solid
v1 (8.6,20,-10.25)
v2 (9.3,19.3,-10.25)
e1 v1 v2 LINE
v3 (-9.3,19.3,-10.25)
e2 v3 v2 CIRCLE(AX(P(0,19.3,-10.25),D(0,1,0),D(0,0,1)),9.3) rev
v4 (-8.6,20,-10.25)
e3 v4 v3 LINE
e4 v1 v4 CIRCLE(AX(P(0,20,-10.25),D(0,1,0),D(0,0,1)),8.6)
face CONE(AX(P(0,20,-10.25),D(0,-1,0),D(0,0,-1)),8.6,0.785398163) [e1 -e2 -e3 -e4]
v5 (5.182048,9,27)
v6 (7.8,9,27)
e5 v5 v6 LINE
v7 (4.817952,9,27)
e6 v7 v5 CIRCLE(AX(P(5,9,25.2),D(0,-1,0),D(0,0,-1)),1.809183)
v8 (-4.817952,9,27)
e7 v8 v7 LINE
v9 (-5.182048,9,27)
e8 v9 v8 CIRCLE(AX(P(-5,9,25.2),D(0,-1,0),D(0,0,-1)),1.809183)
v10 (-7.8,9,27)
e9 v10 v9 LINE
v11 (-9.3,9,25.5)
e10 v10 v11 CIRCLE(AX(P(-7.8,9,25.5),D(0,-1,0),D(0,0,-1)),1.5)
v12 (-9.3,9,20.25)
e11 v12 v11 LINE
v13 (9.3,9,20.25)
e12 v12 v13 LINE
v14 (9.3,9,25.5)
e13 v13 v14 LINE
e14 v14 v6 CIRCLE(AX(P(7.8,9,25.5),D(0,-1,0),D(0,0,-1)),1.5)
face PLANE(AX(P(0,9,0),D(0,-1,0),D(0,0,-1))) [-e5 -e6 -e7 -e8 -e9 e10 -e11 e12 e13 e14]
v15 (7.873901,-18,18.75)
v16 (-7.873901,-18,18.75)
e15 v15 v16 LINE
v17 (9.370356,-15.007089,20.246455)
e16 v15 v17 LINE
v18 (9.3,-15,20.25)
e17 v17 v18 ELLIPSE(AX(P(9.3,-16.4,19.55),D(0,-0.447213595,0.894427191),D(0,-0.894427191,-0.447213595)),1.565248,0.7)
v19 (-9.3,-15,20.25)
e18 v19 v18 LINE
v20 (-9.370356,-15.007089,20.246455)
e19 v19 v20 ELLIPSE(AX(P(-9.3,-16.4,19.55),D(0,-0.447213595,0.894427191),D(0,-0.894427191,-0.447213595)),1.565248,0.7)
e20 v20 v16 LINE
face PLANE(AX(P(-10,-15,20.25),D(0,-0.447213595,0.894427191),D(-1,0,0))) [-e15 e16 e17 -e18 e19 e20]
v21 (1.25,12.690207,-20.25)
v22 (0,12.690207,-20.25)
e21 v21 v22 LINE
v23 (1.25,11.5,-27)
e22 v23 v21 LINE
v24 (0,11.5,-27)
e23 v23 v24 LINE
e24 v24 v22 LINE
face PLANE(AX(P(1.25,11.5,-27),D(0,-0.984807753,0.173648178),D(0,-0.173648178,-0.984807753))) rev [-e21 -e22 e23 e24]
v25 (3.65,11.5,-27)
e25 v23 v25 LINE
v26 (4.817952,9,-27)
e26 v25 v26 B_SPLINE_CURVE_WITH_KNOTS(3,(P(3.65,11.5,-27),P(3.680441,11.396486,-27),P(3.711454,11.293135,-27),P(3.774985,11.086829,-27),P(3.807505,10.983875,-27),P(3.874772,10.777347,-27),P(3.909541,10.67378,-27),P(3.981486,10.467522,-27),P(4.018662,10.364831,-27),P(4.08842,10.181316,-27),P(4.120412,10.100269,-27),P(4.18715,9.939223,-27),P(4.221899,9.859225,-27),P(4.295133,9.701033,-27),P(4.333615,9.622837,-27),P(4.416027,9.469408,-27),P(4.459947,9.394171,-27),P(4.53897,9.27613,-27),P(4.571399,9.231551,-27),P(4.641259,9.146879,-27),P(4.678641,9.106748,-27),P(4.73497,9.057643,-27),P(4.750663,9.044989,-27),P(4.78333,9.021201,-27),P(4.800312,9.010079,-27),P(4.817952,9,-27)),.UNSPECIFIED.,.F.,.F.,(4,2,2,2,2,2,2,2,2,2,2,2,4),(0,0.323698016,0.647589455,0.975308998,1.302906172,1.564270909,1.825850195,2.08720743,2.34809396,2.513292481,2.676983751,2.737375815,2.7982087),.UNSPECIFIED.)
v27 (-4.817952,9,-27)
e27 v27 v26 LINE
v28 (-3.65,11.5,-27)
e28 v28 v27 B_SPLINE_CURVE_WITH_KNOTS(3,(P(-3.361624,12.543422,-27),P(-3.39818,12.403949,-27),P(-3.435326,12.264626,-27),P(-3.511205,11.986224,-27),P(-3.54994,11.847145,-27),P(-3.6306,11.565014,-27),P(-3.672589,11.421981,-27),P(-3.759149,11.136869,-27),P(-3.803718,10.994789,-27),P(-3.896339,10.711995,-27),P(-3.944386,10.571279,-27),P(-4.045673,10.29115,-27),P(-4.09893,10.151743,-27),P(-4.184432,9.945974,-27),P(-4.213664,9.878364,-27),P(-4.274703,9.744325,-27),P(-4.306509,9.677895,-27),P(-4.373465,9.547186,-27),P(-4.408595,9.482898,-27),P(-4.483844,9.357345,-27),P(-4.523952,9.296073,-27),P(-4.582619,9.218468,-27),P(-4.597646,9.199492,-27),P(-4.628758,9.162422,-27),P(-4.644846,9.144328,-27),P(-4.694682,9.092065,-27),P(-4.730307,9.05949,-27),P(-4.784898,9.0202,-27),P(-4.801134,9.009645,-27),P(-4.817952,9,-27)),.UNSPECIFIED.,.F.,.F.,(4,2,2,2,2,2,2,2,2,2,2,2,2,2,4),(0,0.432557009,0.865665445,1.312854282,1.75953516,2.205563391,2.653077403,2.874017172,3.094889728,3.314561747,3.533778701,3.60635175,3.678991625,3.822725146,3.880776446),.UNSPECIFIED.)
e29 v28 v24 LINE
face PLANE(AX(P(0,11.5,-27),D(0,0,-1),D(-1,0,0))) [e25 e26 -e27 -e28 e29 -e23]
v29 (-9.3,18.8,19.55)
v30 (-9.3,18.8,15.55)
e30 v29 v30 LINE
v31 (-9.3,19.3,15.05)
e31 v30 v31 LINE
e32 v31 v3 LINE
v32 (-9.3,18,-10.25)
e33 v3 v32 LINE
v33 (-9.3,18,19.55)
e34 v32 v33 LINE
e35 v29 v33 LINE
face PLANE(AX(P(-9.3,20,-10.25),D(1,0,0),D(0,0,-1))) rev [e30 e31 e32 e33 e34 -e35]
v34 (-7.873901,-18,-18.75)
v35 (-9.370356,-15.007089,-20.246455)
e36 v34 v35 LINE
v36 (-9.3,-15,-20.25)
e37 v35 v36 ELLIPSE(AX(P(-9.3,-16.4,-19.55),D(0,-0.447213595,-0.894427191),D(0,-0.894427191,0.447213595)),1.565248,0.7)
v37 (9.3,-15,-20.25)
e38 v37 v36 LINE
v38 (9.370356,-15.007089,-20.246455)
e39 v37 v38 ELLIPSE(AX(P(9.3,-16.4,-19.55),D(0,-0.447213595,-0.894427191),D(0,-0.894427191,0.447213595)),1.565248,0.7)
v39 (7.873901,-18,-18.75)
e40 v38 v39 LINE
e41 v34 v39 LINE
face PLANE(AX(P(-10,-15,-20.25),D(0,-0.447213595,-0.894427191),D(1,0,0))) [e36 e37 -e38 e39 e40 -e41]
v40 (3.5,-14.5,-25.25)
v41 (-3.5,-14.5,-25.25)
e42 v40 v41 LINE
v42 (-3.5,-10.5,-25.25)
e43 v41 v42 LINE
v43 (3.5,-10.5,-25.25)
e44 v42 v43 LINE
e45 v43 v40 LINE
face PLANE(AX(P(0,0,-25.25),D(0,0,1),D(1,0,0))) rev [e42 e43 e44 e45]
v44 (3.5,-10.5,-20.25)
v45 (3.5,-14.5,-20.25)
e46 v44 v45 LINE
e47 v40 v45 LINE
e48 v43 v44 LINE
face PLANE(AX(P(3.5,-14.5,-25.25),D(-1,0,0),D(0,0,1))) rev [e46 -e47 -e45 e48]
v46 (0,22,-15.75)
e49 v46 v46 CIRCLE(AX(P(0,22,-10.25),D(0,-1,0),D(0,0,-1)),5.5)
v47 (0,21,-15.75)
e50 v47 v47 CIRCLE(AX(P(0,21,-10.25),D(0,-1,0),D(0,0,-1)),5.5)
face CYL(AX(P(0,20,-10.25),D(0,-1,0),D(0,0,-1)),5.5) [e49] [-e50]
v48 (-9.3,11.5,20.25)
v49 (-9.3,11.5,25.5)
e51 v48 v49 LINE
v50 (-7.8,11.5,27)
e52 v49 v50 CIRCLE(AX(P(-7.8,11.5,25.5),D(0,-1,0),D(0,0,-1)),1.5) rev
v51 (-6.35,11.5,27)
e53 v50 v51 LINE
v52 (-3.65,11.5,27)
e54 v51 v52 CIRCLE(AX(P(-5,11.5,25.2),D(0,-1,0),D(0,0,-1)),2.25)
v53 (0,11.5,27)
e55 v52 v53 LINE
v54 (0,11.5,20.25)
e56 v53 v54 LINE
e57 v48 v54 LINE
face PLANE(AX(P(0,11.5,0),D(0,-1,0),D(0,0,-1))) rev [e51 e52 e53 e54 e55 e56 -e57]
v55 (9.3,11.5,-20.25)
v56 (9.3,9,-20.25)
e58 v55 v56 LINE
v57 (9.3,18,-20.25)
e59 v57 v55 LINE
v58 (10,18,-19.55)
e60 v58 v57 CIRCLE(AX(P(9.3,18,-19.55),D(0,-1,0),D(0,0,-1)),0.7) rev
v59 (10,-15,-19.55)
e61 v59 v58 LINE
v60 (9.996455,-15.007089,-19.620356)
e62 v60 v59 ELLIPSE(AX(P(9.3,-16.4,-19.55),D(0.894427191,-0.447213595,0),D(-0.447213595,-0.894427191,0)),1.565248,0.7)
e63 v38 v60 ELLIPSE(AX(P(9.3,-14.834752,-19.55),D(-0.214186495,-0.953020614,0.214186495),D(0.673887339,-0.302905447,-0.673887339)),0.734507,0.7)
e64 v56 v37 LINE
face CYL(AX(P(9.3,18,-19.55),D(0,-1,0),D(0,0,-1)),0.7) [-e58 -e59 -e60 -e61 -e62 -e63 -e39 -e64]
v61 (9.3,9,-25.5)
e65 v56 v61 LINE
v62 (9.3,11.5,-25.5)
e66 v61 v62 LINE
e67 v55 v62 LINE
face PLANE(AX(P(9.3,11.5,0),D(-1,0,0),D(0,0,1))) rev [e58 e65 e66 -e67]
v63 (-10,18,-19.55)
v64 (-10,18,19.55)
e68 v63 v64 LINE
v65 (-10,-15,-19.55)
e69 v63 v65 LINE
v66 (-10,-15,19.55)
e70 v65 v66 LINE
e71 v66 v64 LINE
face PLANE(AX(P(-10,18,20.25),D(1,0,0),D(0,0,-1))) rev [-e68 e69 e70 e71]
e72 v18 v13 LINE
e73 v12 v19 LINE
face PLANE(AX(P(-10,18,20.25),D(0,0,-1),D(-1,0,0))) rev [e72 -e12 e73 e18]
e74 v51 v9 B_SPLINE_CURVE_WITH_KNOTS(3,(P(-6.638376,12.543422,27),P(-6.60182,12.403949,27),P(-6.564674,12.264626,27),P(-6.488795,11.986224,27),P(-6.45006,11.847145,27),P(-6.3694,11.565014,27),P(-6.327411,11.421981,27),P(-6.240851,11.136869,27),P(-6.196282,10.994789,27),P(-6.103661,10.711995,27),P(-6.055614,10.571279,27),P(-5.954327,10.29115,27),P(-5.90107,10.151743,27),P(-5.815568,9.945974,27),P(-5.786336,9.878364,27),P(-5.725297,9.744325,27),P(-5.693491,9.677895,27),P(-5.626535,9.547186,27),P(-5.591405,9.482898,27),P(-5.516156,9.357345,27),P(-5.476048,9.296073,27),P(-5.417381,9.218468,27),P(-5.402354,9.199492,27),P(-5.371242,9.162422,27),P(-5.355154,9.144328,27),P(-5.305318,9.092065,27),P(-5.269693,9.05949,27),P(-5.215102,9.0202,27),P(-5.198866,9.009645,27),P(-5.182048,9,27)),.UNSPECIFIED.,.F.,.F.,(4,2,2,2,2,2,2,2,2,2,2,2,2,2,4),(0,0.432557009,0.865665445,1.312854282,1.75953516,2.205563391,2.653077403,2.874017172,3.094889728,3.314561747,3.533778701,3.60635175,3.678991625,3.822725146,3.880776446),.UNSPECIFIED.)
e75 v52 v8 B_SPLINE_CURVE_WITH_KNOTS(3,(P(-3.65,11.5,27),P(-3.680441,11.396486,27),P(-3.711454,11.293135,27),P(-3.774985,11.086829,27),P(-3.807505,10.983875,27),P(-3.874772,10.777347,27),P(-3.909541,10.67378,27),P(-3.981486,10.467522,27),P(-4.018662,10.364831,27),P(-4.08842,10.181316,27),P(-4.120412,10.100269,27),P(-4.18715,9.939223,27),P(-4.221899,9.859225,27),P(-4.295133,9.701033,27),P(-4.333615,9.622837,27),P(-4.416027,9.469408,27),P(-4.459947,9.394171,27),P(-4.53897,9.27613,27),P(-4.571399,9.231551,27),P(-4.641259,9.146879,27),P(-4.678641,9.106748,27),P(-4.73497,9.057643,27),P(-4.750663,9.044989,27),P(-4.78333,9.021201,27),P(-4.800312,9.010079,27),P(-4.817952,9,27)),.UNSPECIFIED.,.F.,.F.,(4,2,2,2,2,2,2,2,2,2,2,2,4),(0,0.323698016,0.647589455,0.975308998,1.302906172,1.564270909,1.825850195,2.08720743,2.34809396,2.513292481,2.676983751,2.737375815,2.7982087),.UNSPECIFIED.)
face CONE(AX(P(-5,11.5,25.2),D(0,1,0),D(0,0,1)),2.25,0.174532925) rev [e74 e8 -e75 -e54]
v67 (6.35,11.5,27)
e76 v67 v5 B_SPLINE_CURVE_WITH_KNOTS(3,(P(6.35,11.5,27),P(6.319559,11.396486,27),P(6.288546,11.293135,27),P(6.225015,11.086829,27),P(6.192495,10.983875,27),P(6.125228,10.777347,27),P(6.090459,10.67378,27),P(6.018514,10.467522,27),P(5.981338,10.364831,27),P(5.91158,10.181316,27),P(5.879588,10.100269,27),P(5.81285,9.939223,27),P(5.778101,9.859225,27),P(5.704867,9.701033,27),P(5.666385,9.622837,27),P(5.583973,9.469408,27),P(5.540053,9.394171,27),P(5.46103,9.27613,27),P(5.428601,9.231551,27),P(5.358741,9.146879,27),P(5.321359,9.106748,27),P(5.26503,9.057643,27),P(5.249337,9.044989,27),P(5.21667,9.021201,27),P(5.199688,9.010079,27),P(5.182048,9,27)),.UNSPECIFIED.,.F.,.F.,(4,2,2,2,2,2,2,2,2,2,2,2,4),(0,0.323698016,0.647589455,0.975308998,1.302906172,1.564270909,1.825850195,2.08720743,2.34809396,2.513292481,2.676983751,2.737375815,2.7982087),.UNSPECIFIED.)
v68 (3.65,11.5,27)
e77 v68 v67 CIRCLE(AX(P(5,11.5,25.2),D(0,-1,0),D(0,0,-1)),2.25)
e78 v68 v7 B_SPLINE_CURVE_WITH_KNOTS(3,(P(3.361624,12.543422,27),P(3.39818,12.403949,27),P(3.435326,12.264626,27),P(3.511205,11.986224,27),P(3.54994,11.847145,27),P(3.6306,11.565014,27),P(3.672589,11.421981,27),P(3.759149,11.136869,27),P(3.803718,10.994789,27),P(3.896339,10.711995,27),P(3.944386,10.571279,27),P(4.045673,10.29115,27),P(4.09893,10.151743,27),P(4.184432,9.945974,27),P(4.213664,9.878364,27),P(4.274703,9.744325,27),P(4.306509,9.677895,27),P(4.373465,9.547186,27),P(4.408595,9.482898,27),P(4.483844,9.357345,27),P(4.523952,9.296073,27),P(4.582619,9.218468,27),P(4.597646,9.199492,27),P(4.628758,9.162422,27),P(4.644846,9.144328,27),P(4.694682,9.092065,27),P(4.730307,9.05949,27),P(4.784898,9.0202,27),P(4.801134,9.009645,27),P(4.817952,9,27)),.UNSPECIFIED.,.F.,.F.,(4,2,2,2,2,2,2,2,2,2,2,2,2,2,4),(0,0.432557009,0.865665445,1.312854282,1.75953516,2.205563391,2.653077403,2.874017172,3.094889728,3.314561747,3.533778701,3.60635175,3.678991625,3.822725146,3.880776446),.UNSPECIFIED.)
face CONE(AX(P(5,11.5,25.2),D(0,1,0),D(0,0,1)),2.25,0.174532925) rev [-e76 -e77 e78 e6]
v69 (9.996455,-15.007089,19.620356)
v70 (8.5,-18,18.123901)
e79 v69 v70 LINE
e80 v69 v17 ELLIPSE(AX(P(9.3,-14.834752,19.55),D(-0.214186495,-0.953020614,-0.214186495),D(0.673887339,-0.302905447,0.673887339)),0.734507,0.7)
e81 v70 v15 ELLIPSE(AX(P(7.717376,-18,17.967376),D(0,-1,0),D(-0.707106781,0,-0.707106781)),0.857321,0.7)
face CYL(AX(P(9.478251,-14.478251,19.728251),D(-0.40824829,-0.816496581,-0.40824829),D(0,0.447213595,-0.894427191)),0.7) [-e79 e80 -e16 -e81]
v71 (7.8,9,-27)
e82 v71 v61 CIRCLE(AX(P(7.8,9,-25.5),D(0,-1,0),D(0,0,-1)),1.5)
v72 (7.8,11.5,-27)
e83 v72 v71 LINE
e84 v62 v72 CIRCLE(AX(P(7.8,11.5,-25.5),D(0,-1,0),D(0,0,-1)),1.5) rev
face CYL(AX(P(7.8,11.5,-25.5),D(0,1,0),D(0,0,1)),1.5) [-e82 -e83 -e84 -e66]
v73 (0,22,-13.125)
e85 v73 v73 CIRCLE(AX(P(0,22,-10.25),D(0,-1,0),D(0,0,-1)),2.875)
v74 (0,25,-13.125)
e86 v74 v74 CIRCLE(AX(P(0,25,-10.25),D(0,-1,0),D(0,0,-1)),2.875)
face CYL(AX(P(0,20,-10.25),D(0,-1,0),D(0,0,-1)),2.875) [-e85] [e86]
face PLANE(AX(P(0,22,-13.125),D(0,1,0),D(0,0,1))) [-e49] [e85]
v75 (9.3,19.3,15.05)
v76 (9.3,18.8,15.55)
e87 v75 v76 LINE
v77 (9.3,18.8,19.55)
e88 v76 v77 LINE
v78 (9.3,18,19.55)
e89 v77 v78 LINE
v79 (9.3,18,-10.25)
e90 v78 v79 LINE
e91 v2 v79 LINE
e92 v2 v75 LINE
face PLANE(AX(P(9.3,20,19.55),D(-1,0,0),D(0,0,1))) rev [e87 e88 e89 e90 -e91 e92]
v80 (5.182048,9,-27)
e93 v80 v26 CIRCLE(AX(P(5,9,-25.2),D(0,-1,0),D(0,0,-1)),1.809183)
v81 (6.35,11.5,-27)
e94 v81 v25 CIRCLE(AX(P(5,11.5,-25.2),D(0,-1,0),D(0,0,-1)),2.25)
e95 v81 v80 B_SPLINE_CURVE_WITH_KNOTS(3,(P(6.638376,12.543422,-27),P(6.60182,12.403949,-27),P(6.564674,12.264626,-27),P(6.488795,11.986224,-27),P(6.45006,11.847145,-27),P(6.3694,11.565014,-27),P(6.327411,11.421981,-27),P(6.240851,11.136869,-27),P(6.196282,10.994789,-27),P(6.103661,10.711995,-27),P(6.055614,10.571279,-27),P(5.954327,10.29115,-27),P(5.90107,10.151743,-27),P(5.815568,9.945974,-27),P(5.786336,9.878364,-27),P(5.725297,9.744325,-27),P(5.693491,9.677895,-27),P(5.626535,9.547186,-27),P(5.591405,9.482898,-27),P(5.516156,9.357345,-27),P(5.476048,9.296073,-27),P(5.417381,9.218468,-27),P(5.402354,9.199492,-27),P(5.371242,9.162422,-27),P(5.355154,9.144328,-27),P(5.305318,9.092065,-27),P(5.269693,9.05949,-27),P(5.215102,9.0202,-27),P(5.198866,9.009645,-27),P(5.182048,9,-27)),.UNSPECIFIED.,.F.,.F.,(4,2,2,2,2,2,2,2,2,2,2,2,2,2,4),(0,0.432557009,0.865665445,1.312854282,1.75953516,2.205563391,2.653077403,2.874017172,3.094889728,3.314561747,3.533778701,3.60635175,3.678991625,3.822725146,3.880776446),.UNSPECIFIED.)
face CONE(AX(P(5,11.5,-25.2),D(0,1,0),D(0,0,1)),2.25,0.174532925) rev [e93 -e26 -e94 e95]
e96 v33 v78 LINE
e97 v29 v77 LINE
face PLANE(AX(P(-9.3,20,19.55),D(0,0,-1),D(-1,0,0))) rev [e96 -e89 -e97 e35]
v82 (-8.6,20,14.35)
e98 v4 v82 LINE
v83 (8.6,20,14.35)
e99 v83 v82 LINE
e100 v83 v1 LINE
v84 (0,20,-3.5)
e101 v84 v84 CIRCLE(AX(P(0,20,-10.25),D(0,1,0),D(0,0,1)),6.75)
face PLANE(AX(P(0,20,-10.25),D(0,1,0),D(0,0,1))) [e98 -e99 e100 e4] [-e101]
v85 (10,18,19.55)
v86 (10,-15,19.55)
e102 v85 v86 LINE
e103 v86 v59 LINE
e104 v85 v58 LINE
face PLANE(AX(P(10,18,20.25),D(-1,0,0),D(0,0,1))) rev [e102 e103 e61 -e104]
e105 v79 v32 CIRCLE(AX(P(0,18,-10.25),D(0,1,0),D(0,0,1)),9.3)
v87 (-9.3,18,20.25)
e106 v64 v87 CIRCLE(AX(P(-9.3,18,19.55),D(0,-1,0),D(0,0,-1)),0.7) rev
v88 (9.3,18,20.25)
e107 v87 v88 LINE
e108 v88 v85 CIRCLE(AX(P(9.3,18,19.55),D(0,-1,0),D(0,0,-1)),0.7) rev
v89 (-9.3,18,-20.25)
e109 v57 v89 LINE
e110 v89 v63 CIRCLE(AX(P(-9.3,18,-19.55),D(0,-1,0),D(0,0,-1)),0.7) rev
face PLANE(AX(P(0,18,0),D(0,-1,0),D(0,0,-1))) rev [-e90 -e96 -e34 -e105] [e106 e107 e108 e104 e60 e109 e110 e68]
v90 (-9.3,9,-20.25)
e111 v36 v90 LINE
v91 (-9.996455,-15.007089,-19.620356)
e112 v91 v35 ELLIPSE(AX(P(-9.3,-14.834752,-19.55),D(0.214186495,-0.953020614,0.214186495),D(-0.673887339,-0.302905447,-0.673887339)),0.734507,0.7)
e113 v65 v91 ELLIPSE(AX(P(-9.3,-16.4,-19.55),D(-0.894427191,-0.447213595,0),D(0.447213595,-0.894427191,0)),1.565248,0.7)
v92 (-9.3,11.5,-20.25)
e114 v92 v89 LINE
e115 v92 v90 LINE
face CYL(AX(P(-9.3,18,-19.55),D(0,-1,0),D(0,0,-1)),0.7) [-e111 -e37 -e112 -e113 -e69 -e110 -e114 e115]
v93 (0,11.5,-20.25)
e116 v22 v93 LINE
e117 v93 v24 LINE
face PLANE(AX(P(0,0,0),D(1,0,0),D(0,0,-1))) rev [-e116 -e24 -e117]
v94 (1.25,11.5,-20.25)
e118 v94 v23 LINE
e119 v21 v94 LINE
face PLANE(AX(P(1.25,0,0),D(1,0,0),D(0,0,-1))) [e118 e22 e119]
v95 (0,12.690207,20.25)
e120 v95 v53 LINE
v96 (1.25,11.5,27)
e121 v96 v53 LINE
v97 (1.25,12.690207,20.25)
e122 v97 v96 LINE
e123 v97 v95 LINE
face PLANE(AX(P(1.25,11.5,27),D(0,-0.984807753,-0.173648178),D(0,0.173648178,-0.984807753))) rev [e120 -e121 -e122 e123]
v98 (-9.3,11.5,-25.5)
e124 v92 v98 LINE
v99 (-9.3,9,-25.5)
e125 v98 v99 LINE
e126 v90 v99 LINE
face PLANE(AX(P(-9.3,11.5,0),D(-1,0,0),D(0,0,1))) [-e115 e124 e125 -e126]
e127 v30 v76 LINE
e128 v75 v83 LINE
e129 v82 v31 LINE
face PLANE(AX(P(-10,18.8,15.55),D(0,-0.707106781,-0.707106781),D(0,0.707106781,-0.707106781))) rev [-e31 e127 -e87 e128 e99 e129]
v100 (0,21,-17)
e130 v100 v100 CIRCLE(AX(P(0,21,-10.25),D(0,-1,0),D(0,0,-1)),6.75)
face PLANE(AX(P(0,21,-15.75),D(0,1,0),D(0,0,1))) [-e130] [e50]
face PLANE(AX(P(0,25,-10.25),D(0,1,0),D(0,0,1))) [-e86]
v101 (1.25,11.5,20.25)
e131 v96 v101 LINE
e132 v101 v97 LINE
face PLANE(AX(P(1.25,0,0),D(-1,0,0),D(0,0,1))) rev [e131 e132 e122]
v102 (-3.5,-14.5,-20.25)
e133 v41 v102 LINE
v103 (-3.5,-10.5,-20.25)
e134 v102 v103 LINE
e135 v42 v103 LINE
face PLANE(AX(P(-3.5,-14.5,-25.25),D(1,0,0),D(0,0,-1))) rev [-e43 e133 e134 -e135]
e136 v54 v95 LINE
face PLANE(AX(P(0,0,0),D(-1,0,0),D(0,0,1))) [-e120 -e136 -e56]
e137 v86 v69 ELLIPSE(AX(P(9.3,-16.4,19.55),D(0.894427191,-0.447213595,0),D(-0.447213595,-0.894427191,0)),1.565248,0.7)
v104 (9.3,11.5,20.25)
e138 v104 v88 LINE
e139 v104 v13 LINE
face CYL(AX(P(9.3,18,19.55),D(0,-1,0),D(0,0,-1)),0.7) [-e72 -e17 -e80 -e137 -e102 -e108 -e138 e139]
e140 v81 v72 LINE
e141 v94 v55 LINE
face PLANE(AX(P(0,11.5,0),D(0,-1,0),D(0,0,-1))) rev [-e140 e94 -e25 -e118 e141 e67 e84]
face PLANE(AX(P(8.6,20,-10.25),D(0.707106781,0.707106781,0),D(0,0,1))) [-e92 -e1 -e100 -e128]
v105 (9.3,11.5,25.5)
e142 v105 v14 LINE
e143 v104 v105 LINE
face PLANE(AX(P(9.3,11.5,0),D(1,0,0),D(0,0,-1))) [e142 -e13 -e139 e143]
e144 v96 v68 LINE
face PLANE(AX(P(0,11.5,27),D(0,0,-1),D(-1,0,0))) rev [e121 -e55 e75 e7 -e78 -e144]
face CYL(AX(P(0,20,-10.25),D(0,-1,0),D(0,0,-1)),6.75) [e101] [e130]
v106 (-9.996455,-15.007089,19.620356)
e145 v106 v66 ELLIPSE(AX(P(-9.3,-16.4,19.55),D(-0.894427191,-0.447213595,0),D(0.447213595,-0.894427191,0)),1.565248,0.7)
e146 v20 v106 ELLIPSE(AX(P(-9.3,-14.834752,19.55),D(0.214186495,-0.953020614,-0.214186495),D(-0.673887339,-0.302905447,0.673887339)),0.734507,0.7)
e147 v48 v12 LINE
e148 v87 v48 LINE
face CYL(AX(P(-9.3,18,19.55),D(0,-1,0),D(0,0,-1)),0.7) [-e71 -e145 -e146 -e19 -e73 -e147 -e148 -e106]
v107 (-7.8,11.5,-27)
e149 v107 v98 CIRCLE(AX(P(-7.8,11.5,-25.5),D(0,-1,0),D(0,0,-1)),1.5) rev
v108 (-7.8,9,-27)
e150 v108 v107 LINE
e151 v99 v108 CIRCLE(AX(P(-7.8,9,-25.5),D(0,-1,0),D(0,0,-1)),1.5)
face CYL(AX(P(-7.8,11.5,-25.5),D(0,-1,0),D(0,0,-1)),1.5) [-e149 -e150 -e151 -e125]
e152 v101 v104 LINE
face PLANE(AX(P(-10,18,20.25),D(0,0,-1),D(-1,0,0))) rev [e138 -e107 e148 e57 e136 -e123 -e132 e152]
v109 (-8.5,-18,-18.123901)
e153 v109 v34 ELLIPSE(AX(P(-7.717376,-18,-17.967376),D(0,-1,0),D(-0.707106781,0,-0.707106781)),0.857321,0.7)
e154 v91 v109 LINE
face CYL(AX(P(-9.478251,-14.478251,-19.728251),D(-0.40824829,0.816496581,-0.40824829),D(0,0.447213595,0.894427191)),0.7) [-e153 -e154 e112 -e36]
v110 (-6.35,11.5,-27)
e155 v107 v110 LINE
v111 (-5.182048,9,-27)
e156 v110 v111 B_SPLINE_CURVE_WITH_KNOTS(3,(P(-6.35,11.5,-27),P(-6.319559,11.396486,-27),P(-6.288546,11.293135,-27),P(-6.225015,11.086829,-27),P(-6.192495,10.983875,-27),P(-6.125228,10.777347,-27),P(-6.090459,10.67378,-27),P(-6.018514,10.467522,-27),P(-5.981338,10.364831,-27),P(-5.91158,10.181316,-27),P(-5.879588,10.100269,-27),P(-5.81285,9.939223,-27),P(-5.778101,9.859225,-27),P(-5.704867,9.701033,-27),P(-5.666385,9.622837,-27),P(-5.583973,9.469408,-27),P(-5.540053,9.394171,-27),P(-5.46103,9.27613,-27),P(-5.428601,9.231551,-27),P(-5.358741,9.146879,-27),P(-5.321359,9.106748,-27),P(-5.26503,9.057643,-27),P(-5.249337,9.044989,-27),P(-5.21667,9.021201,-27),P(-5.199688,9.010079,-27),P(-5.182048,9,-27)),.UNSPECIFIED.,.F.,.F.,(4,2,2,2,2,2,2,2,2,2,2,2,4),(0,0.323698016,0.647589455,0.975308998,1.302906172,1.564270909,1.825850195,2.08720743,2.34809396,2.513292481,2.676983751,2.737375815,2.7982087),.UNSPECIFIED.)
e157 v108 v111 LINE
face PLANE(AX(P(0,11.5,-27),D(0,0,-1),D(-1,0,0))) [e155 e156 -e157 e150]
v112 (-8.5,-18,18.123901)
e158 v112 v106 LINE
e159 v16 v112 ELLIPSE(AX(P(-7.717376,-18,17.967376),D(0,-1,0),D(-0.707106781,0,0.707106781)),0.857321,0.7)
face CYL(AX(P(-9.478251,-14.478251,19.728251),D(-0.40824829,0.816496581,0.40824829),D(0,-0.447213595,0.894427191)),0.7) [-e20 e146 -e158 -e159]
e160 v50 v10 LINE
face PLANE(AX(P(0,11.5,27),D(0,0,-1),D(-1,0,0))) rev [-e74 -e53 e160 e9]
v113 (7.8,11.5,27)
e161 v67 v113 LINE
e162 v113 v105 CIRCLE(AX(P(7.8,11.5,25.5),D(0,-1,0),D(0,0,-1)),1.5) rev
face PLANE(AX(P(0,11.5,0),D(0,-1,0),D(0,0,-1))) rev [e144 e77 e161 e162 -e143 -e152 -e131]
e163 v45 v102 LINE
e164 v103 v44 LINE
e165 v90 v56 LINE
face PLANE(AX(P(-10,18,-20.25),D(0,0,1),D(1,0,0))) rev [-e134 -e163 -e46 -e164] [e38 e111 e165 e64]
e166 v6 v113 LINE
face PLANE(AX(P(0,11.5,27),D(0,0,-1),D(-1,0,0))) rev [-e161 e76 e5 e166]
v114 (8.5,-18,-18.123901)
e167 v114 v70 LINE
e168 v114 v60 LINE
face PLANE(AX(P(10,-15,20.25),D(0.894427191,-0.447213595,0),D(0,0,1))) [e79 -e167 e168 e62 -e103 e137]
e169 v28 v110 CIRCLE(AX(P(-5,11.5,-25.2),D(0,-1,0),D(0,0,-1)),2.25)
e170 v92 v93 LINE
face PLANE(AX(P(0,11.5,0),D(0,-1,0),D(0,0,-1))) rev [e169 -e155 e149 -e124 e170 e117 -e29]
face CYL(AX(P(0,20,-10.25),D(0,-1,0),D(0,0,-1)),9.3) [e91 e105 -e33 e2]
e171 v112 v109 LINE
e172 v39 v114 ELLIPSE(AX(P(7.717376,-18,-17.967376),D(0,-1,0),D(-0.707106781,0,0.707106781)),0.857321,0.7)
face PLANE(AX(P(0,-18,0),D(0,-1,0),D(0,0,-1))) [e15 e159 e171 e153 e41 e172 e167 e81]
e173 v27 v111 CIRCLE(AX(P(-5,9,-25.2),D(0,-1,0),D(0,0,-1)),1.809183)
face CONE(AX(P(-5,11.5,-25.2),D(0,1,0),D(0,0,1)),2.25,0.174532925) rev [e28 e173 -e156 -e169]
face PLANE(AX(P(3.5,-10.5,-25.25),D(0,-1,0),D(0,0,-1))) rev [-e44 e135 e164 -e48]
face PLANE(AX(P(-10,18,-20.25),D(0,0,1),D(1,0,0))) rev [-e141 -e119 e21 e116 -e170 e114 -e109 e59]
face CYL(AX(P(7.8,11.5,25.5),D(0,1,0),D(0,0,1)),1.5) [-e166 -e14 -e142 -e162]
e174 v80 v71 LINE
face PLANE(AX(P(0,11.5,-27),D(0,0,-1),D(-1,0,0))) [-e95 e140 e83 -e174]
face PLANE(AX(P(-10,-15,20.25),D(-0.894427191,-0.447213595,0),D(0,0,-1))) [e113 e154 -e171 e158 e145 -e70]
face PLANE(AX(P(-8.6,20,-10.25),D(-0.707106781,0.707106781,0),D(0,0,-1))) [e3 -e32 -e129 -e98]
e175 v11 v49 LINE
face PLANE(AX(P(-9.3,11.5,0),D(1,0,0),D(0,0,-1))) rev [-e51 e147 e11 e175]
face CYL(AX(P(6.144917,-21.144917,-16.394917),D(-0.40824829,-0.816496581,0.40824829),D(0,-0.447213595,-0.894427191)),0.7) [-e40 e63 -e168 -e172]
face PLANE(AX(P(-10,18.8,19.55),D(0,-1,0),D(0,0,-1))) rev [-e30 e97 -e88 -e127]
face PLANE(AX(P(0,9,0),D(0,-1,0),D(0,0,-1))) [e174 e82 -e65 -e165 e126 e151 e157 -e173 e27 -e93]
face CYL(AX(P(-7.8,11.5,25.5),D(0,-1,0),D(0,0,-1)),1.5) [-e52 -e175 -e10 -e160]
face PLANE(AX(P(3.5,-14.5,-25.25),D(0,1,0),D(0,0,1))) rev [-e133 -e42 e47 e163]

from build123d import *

# Parameters (mm, degrees)
SKETCH1_W               = 20
SKETCH1_H               = 40.5
BOSS_EXTRUDE1_DEPTH     = 18
BOSS_EXTRUDE2_DEPTH     = 2
BOSS_EXTRUDE3_DEPTH     = 2.5
FILLET1_R               = 1.5
BOSS_EXTRUDE4_DEPTH     = 1.25
DRAFT1_ANGLE            = 10
SKETCH7_W               = 7
SKETCH7_H               = 4
BOSS_EXTRUDE5_DEPTH     = 5
CUT_EXTRUDE1_DEPTH      = 39.13135193
CUT_EXTRUDE1_DEPTH_BACK = 39.13135193
CHAMFER1_SIZE           = 0.7
CHAMFER2_SIZE           = 1.5
CHAMFER2_SIZE2          = 3
FILLET2_R               = 0.7


with BuildPart() as part:
    # Sketch1 → Boss-Extrude1 (new, symmetric)
    with BuildSketch(Plane(origin=(0, 0, 0), x_dir=(1, 0, 0), z_dir=(0, 1, 0))):
        Rectangle(SKETCH1_W, SKETCH1_H)
    extrude(amount=BOSS_EXTRUDE1_DEPTH, both=True)

    # Sketch2 → Boss-Extrude2 (add)
    with BuildSketch(Plane(origin=(0, 18, 0), x_dir=(1, 0, 0), z_dir=(0, 1, 0))):
        with BuildLine():
            Line((-9.3, 10.25), (-9.3, -19.55))
            Line((-9.3, -19.55), (9.3, -19.55))
            Line((9.3, -19.55), (9.3, 10.25))
            ThreePointArc((9.3, 10.25), (0, 19.55), (-9.3, 10.25))
        make_face()
    extrude(amount=BOSS_EXTRUDE2_DEPTH)

    # Sketch4 → Revolve1 (revolve)
    with BuildSketch(Plane(origin=(0, 0, 0), x_dir=(0, 0, -1), z_dir=(1, 0, 0))):
        Polygon((10.25, 20), (10.25, 25), (13.125, 25), (13.125, 22), (15.75, 22), (15.75, 21), (17, 21), (17, 20), align=None)
    revolve(axis=Axis((0, 20, -10.25), (0, 1, 0)))

    # Sketch5 → Boss-Extrude3 (add)
    with BuildSketch(Plane(origin=(0, 9, 0), x_dir=(-1, 0, 0), z_dir=(0, -1, 0))):
        with BuildLine():
            Line((-9.3, 20.25), (9.3, 20.25))
            Line((9.3, 20.25), (9.3, 27))
            Line((9.3, 27), (6.35, 27))
            ThreePointArc((6.35, 27), (5, 22.95), (3.65, 27))
            Line((3.65, 27), (-3.65, 27))
            ThreePointArc((-3.65, 27), (-5, 22.95), (-6.35, 27))
            Line((-6.35, 27), (-9.3, 27))
            Line((-9.3, 27), (-9.3, 20.25))
        make_face()
        with BuildLine():
            Line((9.3, -20.25), (-9.3, -20.25))
            Line((-9.3, -20.25), (-9.3, -27))
            Line((-9.3, -27), (-6.35, -27))
            ThreePointArc((-6.35, -27), (-5, -22.95), (-3.65, -27))
            Line((-3.65, -27), (3.65, -27))
            ThreePointArc((3.65, -27), (5, -22.95), (6.35, -27))
            Line((6.35, -27), (9.3, -27))
            Line((9.3, -27), (9.3, -20.25))
        make_face()
    extrude(amount=-BOSS_EXTRUDE3_DEPTH)

    # Fillet1
    fillet1_edges = [part.edges().sort_by_distance(p)[0] for p in [
        (-9.3, 10.25, -27),
        (9.3, 10.25, -27),
        (9.3, 10.25, 27),
        (-9.3, 10.25, 27),
    ]]
    fillet(fillet1_edges, radius=FILLET1_R)

    # Sketch6 → Boss-Extrude4 (add)
    with BuildSketch(Plane(origin=(0, 0, 0), x_dir=(0, 0, -1), z_dir=(1, 0, 0))):
        Polygon((20.25, 11.5), (27, 11.5), (20.25, 12.69020712), align=None)
        Polygon((-20.25, 12.69020712), (-20.25, 11.5), (-27, 11.5), align=None)
    extrude(amount=BOSS_EXTRUDE4_DEPTH)

    # Draft1
    draft1_faces = [part.faces().sort_by_distance(p)[0] for p in [
        (5, 10.25, 22.95),
        (-5, 10.25, 22.95),
        (-5, 10.25, -22.95),
        (5, 10.25, -22.95),
    ]]
    draft(draft1_faces, Plane.ZX.offset(11.5), DRAFT1_ANGLE)

    # Sketch7 → Boss-Extrude5 (add)
    with BuildSketch(Plane(origin=(0, 0, -20.25), x_dir=(-1, 0, 0), z_dir=(0, 0, -1))):
        with Locations((0, -12.5)):
            Rectangle(SKETCH7_W, SKETCH7_H)
    extrude(amount=BOSS_EXTRUDE5_DEPTH)

    # Sketch8 → Cut-Extrude1 (cut, two sides: drawn at the far end of the back side and taken through both)
    with BuildSketch(Plane(origin=(0, 0, 0), x_dir=(0, 0, -1), z_dir=(1, 0, 0)).offset(-CUT_EXTRUDE1_DEPTH_BACK)):
        Polygon((-19.55, 18.8), (-15.55, 18.8), (-14.35, 20), (-19.55, 20), align=None)
    extrude(amount=CUT_EXTRUDE1_DEPTH + CUT_EXTRUDE1_DEPTH_BACK, mode=Mode.SUBTRACT)

    # Chamfer1
    chamfer1_edges = [part.edges().sort_by_distance(p)[0] for p in [
        (9.3, 20, 2.05),
        (0, 20, -19.55),
        (-9.3, 20, 2.05),
    ]]
    chamfer(chamfer1_edges, length=CHAMFER1_SIZE)

    # Chamfer2
    chamfer2_edges = [part.edges().sort_by_distance(p)[0] for p in [
        (0, -18, 20.25),
        (-10, -18, 0),
        (0, -18, -20.25),
        (10, -18, 0),
    ]]
    chamfer2_side = [part.faces().sort_by_distance(p)[0] for p in [
        (0, -18, 0),
    ]]
    chamfer(chamfer2_edges, length=CHAMFER2_SIZE, length2=CHAMFER2_SIZE2, reference=chamfer2_side[0])

    # Fillet2
    # the kernel refuses this fillet: 0.7 mm, written as the material it takes off along each edge
    with BuildSketch(Plane(origin=(7.916666667, -19.166666667, 18.166666667), x_dir=(-0.9128709291752769, 0.365148371670112, 0.1825741858350529), z_dir=(0.4082482904638631, 0.8164965809277261, 0.4082482904638631)), Plane(origin=(7.916666667, -19.166666667, -18.166666667), x_dir=(0.18257418583505539, 0.36514837167011077, 0.9128709291752769), z_dir=(0.4082482904638631, 0.8164965809277261, -0.4082482904638631))) as fillet2_piece_1:
        with BuildLine():
            CenterArc((FILLET2_R * 0.816496580928, -FILLET2_R), FILLET2_R, 90, 78.463040967)
            Line((-FILLET2_R * 0.163299316186, -FILLET2_R * 0.8), (0, 0))
            Line((0, 0), (FILLET2_R * 0.816496580928, 0))
        make_face()
    extrude(amount=6.531972647, mode=Mode.SUBTRACT)
    with BuildSketch(Plane(origin=(-7.916666667, -19.166666667, 18.166666667), x_dir=(0.9128709291752769, 0.3651483716701107, 0.18257418583505536), z_dir=(-0.4082482904638631, 0.8164965809277261, 0.4082482904638631)), Plane(origin=(-7.916666667, -19.166666667, -18.166666667), x_dir=(-0.18257418583505539, 0.36514837167011077, 0.9128709291752769), z_dir=(-0.4082482904638631, 0.8164965809277261, -0.4082482904638631))) as fillet2_piece_2:
        with BuildLine():
            CenterArc((FILLET2_R * 0.816496580928, FILLET2_R), FILLET2_R, 191.536959033, 78.463040967)
            Line((-FILLET2_R * 0.163299316186, FILLET2_R * 0.8), (0, 0))
            Line((0, 0), (FILLET2_R * 0.816496580928, 0))
        make_face()
    extrude(amount=6.531972647, mode=Mode.SUBTRACT)
    with BuildSketch(Plane(origin=(10, -16.75, 20.25), x_dir=(-1, 0, 0), z_dir=(0, 1, 0)), Plane(origin=(-10, 19.75, 20.25), x_dir=(1, 0, 0), z_dir=(0, -1, 0)), Plane(origin=(-10, 19.75, -20.25), x_dir=(0, 0, 1), z_dir=(0, -1, 0)), Plane(origin=(10, -16.75, -20.25), x_dir=(0, 0, 1), z_dir=(0, 1, 0))) as fillet2_piece_3:
        with BuildLine():
            CenterArc((FILLET2_R, -FILLET2_R), FILLET2_R, 90, 90)
            Line((0, -FILLET2_R), (0, 0))
            Line((0, 0), (FILLET2_R, 0))
        make_face()
    extrude(amount=36.5, mode=Mode.SUBTRACT)


solid = part.part
